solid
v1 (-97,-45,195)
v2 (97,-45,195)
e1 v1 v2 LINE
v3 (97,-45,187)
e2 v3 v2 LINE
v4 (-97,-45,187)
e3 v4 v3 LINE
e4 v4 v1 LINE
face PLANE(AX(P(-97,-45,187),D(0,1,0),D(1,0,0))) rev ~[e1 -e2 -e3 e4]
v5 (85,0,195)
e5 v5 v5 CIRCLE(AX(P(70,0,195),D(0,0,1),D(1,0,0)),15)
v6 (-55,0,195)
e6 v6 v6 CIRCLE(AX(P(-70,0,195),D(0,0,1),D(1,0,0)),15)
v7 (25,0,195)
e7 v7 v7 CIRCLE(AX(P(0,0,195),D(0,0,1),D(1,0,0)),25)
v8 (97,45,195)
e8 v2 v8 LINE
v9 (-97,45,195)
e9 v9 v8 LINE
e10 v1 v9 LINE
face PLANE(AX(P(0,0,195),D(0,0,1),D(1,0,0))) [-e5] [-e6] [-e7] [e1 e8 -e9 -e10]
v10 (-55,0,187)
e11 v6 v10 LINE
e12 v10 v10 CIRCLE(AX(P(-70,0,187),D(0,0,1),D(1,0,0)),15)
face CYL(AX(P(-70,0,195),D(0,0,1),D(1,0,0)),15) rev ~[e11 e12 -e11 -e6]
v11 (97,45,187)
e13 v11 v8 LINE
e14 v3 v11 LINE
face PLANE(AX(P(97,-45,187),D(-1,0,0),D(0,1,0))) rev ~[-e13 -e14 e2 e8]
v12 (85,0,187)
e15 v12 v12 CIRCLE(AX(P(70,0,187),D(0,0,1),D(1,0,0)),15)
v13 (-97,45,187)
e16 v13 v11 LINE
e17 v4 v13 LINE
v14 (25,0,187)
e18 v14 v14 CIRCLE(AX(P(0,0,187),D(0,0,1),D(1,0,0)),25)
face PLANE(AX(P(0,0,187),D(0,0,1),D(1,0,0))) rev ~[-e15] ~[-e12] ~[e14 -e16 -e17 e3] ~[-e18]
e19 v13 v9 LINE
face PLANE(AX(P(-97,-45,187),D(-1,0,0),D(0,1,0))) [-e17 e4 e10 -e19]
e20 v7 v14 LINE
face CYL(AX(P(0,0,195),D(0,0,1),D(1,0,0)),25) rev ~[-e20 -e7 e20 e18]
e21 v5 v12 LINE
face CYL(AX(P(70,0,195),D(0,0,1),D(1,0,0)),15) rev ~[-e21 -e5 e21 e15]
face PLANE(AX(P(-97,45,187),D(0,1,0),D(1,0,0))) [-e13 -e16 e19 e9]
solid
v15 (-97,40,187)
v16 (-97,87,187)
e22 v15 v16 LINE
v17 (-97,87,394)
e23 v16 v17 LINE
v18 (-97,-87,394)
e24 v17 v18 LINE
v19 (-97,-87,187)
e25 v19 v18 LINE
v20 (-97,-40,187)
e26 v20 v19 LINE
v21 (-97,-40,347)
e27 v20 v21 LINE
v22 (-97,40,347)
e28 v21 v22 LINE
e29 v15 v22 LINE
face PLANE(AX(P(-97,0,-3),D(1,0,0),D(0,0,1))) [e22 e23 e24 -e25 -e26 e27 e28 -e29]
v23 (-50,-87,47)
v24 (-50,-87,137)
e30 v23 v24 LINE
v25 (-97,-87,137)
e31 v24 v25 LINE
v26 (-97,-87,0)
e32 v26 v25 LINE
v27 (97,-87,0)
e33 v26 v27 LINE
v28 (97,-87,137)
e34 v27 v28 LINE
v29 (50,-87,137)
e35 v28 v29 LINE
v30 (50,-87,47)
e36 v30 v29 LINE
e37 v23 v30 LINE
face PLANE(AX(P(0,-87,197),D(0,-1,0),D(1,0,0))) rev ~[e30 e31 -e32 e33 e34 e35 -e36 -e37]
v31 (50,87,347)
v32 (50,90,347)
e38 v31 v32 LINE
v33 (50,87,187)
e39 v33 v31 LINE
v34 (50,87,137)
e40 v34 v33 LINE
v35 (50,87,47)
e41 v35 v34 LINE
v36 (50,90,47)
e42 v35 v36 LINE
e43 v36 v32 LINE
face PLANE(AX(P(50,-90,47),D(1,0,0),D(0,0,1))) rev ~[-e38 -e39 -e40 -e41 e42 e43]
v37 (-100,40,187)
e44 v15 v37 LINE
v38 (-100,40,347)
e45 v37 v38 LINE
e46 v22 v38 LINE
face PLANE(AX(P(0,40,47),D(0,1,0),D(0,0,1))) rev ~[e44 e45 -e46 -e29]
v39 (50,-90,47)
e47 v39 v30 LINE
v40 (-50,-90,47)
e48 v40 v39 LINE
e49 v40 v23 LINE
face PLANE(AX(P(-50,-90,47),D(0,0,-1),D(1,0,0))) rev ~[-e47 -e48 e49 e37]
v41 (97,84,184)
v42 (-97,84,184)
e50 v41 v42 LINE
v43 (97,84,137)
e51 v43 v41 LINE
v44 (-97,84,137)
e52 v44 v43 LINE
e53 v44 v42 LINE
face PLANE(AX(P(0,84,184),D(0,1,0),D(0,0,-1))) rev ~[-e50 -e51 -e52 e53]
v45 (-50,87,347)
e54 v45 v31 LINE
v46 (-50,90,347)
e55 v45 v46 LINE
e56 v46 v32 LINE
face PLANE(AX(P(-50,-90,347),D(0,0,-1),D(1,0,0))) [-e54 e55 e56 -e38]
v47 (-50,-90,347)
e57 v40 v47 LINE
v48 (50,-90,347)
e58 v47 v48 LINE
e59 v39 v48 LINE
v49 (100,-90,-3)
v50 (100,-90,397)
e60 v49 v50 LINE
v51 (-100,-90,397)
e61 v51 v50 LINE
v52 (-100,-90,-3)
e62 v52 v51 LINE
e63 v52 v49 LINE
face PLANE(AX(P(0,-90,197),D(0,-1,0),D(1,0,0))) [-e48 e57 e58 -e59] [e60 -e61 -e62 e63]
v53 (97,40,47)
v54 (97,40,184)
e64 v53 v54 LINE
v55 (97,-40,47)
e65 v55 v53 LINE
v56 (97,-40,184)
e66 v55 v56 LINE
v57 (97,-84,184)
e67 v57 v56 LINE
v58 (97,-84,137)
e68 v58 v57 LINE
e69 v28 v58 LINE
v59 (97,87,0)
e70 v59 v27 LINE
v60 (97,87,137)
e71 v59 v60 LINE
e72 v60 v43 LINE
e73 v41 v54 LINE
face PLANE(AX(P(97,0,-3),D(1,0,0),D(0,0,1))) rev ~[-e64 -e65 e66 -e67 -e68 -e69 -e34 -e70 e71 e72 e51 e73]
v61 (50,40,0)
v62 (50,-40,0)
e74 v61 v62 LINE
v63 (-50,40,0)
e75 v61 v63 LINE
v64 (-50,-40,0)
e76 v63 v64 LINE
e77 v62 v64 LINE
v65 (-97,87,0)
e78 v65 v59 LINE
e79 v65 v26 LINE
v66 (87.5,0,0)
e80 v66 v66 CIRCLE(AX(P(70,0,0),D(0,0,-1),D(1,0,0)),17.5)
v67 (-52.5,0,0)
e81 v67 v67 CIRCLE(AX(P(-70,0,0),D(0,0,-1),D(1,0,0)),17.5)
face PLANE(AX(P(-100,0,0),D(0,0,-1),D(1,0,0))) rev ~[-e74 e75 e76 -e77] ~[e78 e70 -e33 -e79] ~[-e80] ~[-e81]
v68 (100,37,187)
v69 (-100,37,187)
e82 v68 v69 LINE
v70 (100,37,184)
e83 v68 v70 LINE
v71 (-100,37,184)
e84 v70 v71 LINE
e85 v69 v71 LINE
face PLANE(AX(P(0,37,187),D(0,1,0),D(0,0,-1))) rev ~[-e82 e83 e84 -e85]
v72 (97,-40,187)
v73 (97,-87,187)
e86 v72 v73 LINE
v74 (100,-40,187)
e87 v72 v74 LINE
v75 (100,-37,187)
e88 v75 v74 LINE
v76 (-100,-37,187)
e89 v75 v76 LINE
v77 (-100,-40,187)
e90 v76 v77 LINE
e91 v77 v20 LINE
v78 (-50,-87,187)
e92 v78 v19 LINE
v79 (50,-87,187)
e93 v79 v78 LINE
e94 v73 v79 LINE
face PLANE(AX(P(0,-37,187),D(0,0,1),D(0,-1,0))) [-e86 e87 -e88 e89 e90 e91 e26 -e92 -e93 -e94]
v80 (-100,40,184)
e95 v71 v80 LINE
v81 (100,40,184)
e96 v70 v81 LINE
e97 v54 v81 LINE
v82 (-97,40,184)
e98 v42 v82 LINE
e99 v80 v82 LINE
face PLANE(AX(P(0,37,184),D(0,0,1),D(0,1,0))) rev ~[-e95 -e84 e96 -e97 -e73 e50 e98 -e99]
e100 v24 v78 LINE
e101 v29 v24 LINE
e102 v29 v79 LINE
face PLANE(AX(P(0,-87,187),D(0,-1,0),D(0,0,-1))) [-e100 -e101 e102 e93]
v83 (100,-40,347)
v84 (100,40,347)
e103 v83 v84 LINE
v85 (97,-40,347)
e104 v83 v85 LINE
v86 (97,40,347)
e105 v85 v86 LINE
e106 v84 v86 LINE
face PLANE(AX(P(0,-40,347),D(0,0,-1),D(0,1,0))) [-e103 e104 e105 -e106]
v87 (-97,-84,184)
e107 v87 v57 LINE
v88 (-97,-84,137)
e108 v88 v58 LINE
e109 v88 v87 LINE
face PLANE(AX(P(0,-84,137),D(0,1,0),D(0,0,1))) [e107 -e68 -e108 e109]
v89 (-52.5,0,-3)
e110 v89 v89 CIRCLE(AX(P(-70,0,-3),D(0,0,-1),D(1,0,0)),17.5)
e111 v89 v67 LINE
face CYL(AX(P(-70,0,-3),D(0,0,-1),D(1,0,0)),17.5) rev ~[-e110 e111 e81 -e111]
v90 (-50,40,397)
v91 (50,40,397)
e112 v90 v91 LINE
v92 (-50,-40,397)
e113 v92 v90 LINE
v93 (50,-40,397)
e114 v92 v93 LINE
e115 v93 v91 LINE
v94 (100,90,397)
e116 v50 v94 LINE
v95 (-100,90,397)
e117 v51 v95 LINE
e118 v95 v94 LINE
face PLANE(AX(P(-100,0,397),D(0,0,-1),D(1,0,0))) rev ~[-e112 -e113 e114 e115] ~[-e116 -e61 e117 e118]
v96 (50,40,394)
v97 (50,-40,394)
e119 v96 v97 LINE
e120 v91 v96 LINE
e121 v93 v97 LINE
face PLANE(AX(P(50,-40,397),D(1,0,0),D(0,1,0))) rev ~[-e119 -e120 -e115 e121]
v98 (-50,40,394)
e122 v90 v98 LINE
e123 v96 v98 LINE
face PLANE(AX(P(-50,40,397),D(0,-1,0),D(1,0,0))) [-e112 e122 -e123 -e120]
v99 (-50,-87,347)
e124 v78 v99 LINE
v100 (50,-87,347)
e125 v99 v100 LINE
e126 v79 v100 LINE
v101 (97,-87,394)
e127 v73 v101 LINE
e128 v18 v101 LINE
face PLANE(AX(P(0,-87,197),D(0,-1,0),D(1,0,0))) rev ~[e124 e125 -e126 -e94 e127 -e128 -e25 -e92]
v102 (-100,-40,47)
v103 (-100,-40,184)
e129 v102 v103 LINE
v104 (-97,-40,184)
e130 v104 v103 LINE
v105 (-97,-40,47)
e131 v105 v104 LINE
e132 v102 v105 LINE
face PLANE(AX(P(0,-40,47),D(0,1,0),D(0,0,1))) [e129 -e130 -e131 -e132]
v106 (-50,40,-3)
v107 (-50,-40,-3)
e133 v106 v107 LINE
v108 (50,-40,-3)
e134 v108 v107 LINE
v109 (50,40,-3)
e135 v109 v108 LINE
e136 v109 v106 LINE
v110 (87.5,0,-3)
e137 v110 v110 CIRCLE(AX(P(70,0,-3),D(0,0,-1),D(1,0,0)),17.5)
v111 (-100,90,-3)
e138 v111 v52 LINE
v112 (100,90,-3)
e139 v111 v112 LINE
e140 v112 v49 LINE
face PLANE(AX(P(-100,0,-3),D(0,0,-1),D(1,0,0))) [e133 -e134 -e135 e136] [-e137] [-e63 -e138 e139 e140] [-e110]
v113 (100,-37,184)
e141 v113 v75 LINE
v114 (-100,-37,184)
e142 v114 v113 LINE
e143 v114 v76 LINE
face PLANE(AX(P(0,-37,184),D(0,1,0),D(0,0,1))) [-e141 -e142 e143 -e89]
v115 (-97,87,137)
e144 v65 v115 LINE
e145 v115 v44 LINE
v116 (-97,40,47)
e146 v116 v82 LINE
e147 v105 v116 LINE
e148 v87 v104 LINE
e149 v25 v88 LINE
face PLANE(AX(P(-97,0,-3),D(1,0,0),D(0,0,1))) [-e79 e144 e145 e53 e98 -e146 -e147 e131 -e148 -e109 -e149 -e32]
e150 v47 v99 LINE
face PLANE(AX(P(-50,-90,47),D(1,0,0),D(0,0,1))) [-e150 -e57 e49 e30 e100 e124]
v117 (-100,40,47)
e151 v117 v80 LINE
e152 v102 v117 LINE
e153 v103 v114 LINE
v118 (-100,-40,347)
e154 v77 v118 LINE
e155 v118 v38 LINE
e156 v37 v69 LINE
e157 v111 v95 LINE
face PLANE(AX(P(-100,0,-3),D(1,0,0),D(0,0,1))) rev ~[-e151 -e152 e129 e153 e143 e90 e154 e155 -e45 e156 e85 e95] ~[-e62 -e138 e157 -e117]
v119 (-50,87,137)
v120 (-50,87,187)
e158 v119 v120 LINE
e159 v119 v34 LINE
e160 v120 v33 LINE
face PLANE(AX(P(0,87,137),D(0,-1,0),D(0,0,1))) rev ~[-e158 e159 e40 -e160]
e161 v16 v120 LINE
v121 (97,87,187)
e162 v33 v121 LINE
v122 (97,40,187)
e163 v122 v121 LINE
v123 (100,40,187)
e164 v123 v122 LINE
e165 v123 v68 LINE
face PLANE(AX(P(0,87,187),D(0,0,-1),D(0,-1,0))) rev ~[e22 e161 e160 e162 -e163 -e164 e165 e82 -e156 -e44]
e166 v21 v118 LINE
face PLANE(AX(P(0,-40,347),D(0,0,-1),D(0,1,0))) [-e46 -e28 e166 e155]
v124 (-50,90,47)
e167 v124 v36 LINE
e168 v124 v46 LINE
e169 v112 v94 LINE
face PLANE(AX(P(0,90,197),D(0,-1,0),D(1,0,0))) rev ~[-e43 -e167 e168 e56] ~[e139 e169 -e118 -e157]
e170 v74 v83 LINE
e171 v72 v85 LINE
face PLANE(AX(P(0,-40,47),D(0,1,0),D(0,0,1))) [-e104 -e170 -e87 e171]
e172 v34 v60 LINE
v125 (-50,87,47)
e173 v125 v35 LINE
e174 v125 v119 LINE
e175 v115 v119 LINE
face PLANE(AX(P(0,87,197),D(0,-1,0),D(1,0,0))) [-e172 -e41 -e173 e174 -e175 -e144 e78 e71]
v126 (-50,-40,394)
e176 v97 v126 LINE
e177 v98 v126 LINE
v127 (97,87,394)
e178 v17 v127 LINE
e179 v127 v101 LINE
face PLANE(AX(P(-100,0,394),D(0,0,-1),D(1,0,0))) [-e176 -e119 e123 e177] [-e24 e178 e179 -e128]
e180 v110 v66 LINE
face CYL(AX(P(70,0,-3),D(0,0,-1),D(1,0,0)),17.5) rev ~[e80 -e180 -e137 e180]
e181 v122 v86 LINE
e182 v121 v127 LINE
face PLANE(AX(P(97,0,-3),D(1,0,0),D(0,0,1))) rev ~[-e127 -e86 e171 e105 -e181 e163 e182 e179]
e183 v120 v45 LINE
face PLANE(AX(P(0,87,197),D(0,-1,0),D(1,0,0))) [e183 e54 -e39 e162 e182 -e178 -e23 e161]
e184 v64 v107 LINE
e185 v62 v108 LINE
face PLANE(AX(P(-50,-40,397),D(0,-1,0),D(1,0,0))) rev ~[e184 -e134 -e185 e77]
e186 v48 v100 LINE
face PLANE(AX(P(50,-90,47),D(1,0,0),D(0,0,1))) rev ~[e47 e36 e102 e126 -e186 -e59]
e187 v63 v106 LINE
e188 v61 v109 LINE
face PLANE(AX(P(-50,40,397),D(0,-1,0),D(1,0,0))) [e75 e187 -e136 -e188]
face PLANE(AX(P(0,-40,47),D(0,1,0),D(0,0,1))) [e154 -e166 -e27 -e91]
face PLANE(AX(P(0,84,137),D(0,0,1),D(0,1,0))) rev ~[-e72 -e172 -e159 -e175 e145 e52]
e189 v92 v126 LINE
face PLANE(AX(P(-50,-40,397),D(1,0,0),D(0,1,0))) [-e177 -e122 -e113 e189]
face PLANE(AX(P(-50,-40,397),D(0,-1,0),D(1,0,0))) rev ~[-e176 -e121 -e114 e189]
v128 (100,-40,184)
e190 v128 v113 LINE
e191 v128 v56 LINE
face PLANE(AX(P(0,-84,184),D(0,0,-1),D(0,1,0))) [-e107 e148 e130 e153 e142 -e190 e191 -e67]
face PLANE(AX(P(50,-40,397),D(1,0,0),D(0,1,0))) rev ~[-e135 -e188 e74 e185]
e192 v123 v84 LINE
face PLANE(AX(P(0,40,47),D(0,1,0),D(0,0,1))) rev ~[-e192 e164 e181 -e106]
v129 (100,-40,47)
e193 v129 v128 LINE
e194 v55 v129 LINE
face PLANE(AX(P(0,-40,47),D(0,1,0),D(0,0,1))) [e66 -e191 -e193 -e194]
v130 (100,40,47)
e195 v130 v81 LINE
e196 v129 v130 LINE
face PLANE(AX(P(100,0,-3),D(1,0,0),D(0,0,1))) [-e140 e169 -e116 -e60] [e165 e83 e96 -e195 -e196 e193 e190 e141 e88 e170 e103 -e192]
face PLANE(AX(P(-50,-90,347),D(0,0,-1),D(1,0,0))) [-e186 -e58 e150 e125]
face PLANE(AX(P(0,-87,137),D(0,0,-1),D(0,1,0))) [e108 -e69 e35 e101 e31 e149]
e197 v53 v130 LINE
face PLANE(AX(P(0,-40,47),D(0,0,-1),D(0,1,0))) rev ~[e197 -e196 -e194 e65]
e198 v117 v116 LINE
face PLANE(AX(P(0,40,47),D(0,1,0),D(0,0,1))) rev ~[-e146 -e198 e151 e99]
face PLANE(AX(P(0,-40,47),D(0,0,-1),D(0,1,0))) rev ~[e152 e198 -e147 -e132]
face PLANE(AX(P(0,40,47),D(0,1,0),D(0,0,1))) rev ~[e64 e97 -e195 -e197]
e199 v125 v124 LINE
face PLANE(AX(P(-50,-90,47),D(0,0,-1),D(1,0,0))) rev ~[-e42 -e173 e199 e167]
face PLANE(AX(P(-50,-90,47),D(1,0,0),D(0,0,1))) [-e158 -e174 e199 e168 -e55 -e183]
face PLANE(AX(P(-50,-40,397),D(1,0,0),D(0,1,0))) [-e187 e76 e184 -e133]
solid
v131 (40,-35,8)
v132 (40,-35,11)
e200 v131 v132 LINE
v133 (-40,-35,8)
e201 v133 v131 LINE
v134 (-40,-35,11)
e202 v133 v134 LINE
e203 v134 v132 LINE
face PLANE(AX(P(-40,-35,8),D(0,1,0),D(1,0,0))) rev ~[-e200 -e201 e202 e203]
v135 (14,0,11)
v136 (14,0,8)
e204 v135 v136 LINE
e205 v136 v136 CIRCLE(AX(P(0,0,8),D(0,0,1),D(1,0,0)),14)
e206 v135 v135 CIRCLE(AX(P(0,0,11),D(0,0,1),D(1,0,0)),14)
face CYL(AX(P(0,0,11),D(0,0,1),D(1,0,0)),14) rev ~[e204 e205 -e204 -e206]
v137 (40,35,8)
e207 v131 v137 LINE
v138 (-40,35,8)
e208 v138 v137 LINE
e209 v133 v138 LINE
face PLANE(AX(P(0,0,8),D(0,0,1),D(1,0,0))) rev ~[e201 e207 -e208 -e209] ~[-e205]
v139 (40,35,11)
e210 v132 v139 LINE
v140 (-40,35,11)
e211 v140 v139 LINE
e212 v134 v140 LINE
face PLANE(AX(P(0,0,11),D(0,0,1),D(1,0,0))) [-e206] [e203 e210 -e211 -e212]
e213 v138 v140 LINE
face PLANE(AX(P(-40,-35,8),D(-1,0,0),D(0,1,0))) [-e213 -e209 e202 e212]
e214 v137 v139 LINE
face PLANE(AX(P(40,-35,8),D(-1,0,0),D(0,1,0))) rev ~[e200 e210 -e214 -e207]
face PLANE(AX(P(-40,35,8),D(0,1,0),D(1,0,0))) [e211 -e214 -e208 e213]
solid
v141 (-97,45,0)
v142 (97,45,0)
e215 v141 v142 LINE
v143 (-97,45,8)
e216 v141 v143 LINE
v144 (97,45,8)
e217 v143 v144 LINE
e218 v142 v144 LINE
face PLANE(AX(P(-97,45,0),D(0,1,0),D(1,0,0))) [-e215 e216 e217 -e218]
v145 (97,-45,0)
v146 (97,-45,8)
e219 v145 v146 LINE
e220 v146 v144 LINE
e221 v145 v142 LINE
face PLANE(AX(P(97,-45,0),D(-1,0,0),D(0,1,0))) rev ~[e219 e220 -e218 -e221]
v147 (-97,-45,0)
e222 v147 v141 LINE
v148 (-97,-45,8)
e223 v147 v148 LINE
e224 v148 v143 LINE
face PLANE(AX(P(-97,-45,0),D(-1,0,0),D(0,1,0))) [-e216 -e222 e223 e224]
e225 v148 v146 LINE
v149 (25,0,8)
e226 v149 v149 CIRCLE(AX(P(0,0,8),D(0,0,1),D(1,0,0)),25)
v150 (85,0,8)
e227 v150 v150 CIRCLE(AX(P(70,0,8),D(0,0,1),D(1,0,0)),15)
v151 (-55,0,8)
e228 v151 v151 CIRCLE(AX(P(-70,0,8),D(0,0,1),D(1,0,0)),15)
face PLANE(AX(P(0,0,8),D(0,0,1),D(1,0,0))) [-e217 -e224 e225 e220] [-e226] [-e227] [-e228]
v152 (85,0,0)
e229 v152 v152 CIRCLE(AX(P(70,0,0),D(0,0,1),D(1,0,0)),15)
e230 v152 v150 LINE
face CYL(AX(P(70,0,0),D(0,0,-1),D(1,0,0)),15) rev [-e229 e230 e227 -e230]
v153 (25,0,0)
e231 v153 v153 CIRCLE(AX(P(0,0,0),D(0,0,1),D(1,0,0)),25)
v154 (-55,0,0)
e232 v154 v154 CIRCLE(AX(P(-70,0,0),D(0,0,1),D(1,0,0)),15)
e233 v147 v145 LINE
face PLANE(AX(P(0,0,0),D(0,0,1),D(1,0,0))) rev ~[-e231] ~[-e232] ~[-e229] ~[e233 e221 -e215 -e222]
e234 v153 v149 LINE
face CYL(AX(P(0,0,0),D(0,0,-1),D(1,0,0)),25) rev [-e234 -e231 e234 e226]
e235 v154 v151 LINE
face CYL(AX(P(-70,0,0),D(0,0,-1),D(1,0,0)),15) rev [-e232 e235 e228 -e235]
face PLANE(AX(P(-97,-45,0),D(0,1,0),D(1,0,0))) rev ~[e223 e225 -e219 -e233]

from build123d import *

# Parameters (mm, degrees)
F0_W      = 194
F0_H      = 90
F0_R      = 15
F0_R_2    = 25
F1_DEPTH  = 8
F2_W      = 80
F2_H      = 70
F3_DEPTH  = 3
F4_R      = 14
F5_DEPTH  = 25
F6_W      = 200
F6_H      = 400
F7_DEPTH  = 90
F8_W      = 100
F8_H      = 300
F9_DEPTH  = 266
F10_T     = -3
F11_W     = 80
F11_H     = 300
F12_DEPTH = 162
F13_W     = 100
F13_H     = 80
F14_DEPTH = 517
F15_R     = 17.5
F16_DEPTH = 25
F18_DEPTH = 100
F19_W     = 194
F19_H     = 90
F20_DEPTH = 8
F21_R     = 25
F21_R_2   = 15
F22_DEPTH = 25


with BuildPart() as f1:
    # F0 (on Top) → F1 (new body)
    with BuildSketch(Plane.XY):
        Rectangle(F0_W, F0_H)
        with Locations((-70, 0)):
            Circle(F0_R, mode=Mode.SUBTRACT)
        Circle(F0_R_2, mode=Mode.SUBTRACT)
        with Locations((70, 0)):
            Circle(F0_R, mode=Mode.SUBTRACT)
    extrude(amount=F1_DEPTH)


with BuildPart() as f3:
    # F2 (on face) → F3 (new body)
    with BuildSketch(Plane.XY.offset(8)):
        Rectangle(F2_W, F2_H)
    extrude(amount=F3_DEPTH)

    # F4 (on face) → F5 (cut)
    with BuildSketch(Plane.XY.offset(11)):
        Circle(F4_R)
    extrude(amount=-F5_DEPTH, mode=Mode.SUBTRACT)


with BuildPart() as f7:
    # F6 (on Front) → F7 (new body, symmetric)
    with BuildSketch(Plane.XZ):
        with Locations((0, 197)):
            Rectangle(F6_W, F6_H)
    extrude(amount=F7_DEPTH, both=True)

    # F8 (on face) → F9 (cut)
    with BuildSketch(Plane.XZ.offset(90)):
        with Locations((0, 197)):
            Rectangle(F8_W, F8_H)
    extrude(amount=-F9_DEPTH, mode=Mode.SUBTRACT)

    # F10
    f10_openings = [f7.faces().sort_by_distance(p)[0] for p in [
        (50, 0, 197),
        (0, 0, 347),
        (-50, 0, 197),
        (0, 0, 47),
    ]]
    offset(amount=F10_T, openings=f10_openings)

    # F11 (on Right) → F12 (cut, symmetric)
    with BuildSketch(Plane.YZ):
        with Locations((0, 197)):
            Rectangle(F11_W, F11_H)
    extrude(amount=F12_DEPTH, both=True, mode=Mode.SUBTRACT)

    # F13 (on face) → F14 (cut)
    with BuildSketch(Plane.XY.offset(397)):
        Rectangle(F13_W, F13_H)
    extrude(amount=-F14_DEPTH, mode=Mode.SUBTRACT)

    # F15 (on face) → F16 (cut)
    with BuildSketch(Plane(origin=(0, 0, -3), x_dir=(1, 0, 0), z_dir=(0, 0, -1))):
        with Locations((70, 0)):
            Circle(F15_R)
        with Locations((-70, 0)):
            Circle(F15_R)
    extrude(amount=-F16_DEPTH, mode=Mode.SUBTRACT)

    # F17 (on Right) → F18 (join, symmetric)
    with BuildSketch(Plane.YZ):
        Polygon((84, 184), (84, 137), (87, 137), (87, 187), (37, 187), (37, 184), align=None)
        Polygon((-87, 137), (-84, 137), (-84, 184), (-37, 184), (-37, 187), (-87, 187), align=None)
    extrude(amount=F18_DEPTH, both=True)


with BuildPart() as f20:
    # F19 (on face) → F20 (new body)
    with BuildSketch(Plane.XY.offset(187)):
        Rectangle(F19_W, F19_H)
    extrude(amount=F20_DEPTH)

    # F21 (on face) → F22 (cut)
    with BuildSketch(Plane.XY.offset(195)):
        Circle(F21_R)
        with Locations((70, 0)):
            Circle(F21_R_2)
        with Locations((-70, 0)):
            Circle(F21_R_2)
    extrude(amount=-F22_DEPTH, mode=Mode.SUBTRACT)


solid = Compound([f1.part, f3.part, f7.part, f20.part])
